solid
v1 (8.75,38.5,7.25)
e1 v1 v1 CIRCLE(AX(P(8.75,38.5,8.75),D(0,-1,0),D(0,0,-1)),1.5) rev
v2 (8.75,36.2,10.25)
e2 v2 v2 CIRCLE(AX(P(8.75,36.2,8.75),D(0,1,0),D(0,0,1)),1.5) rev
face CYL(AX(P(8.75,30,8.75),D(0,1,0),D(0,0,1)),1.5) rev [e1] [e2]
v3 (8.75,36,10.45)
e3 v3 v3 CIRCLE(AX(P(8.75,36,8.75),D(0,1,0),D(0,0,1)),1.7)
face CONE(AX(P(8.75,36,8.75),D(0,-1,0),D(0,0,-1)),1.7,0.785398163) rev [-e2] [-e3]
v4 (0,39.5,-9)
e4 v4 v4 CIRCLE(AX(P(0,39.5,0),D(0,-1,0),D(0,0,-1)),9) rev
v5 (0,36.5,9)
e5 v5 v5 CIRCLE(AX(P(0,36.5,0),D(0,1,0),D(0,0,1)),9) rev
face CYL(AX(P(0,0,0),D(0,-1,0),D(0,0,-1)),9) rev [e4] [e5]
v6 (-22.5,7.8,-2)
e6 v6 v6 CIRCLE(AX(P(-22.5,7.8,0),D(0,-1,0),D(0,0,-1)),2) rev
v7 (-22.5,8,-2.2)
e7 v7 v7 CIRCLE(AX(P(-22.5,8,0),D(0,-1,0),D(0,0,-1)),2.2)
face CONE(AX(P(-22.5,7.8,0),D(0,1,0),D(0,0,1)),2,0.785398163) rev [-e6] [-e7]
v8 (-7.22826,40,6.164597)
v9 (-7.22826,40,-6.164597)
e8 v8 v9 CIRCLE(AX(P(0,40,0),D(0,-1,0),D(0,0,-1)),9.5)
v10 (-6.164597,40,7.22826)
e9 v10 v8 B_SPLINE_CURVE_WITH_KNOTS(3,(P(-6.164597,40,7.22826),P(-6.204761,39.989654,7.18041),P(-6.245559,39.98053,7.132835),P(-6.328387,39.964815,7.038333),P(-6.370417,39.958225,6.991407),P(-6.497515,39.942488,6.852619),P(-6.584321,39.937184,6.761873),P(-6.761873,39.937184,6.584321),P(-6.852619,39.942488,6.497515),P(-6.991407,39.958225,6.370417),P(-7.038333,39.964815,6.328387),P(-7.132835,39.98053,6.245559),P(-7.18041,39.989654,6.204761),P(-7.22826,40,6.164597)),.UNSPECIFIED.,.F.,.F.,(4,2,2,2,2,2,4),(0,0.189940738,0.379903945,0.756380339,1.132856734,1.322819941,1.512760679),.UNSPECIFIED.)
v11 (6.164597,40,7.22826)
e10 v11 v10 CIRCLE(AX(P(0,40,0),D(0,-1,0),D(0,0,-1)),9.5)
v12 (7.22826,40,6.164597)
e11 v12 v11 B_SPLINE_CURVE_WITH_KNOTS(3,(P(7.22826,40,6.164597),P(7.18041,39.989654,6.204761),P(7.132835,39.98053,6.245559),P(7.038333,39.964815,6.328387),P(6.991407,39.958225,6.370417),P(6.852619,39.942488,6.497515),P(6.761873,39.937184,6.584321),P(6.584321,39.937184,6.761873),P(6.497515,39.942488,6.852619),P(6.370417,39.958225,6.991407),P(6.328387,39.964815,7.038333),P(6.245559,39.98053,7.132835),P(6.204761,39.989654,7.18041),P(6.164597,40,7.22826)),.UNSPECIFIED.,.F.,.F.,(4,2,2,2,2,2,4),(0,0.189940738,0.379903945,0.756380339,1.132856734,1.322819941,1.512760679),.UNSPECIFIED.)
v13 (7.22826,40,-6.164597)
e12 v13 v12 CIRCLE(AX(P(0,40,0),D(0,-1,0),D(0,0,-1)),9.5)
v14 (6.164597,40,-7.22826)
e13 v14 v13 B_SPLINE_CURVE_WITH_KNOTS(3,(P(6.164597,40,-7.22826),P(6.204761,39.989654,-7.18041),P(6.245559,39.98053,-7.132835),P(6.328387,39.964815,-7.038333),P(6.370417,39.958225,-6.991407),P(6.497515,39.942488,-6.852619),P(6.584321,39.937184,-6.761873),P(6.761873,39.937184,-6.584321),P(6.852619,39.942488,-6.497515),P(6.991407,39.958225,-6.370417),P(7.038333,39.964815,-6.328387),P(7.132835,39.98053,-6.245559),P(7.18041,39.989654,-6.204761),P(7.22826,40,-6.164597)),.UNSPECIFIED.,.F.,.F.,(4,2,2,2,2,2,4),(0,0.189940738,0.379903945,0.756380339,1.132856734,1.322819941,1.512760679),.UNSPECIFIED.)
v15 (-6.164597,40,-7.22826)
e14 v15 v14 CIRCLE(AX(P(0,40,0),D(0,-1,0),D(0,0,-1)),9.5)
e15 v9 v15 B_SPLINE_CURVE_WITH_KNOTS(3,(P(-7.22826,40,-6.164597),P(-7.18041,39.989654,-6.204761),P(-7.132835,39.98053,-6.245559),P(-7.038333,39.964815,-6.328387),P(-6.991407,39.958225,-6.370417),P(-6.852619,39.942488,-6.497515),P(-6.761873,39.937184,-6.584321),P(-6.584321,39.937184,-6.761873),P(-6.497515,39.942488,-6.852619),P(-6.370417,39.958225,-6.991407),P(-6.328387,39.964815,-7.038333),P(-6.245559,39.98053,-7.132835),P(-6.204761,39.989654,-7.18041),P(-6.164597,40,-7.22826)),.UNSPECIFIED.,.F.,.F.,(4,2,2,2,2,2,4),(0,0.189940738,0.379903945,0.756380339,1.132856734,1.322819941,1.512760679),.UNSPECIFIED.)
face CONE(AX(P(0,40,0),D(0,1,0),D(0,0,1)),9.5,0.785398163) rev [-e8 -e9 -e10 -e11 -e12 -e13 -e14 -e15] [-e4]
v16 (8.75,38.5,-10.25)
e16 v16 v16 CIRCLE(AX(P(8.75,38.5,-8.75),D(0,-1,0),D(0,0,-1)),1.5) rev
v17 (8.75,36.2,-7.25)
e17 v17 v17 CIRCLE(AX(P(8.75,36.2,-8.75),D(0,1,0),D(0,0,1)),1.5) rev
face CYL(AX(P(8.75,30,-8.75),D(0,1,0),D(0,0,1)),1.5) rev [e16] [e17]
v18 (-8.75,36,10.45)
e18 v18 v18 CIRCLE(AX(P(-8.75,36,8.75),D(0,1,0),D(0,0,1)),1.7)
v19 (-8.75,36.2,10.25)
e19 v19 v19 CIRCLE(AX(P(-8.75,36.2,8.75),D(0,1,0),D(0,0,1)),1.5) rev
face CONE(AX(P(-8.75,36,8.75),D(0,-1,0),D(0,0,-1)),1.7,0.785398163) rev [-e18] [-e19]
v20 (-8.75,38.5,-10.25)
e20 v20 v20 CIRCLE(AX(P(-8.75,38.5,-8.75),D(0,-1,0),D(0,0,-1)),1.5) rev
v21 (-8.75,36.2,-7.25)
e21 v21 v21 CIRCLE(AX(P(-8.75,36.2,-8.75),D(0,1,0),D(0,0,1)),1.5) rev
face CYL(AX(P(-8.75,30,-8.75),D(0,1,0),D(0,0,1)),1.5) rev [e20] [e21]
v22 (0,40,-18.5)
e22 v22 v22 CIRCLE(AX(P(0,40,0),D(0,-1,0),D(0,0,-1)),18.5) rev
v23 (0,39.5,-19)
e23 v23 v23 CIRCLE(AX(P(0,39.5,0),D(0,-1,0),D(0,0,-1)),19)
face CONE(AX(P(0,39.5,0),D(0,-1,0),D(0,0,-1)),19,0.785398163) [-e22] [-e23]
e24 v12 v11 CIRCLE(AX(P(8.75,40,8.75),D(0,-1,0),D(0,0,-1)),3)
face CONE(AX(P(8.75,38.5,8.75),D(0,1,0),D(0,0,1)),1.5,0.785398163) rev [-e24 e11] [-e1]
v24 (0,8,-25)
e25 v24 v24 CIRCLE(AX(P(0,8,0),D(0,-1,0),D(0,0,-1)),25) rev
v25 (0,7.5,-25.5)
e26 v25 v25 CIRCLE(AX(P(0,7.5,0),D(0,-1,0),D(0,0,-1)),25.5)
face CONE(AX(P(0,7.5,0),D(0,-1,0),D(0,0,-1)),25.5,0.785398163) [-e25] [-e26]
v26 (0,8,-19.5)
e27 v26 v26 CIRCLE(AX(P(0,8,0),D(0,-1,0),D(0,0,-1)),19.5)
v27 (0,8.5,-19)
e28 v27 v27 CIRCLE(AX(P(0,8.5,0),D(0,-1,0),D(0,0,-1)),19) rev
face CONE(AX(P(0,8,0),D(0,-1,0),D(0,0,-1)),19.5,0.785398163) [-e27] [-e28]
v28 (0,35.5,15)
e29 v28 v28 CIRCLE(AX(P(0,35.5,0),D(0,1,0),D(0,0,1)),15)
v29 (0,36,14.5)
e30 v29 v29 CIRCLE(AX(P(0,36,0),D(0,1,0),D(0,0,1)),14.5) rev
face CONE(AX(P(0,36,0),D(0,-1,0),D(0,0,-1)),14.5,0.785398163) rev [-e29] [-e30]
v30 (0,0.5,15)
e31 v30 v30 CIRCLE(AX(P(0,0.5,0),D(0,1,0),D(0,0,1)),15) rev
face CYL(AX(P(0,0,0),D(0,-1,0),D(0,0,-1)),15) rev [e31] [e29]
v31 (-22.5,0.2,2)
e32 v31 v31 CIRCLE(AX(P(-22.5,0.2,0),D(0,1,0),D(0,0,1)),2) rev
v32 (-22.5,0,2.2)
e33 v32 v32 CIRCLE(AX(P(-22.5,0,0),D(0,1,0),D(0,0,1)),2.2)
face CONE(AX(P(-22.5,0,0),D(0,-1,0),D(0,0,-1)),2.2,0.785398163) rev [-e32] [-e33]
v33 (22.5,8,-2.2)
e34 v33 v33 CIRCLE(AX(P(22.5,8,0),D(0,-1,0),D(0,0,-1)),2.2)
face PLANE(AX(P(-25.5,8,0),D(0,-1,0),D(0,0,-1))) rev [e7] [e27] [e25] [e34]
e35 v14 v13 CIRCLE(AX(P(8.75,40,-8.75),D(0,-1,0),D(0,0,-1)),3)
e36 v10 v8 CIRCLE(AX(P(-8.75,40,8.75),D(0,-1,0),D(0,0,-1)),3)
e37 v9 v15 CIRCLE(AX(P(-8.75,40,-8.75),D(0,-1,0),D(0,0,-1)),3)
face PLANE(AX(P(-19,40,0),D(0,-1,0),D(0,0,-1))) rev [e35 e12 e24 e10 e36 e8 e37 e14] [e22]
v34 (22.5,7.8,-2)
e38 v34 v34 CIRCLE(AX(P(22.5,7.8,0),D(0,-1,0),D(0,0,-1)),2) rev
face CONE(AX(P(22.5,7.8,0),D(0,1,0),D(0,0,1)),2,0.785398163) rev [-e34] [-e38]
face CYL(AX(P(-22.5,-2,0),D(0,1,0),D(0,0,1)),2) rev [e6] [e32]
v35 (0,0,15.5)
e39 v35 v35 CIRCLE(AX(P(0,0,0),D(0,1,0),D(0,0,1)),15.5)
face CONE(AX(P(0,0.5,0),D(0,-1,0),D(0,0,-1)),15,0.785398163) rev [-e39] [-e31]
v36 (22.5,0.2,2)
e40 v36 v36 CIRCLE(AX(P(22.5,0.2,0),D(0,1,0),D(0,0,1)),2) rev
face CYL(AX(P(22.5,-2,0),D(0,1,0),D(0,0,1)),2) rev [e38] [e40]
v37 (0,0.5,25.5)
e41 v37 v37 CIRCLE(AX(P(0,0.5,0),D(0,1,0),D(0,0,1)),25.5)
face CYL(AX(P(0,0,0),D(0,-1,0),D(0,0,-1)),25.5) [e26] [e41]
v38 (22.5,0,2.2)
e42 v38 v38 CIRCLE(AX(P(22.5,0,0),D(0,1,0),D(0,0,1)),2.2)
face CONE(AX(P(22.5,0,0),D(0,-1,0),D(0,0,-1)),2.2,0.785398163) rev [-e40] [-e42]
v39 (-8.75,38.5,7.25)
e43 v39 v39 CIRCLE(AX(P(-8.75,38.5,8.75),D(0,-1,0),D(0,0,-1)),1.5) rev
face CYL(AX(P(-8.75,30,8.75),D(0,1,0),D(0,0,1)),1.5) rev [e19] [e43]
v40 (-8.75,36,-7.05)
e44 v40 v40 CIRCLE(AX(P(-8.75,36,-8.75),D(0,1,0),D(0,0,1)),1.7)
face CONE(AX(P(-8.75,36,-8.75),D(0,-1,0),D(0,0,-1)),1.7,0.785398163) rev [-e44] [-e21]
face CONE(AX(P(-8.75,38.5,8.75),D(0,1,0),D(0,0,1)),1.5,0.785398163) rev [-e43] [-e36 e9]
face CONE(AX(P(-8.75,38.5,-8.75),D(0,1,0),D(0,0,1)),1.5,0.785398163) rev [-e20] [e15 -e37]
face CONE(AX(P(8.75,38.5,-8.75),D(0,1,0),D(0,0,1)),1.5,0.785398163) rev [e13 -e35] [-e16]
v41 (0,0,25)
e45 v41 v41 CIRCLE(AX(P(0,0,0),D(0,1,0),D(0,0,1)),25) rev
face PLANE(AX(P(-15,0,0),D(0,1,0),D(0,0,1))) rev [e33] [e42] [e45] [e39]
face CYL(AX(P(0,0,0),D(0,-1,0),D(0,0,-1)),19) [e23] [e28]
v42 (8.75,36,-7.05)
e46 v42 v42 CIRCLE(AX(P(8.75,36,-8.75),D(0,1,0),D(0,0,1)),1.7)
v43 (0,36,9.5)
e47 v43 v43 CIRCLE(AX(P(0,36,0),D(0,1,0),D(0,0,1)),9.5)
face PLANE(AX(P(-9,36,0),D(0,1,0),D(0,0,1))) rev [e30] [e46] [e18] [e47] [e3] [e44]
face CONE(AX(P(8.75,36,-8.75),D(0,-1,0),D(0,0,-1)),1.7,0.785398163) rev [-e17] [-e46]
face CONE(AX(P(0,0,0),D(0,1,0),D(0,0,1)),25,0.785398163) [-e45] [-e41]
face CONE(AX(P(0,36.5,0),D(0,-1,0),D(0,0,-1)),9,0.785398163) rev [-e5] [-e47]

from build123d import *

# Parameters (mm, degrees)
ESQUISSE2_R             = 1.5
ENL_V_MAT_EXTRU_1_DEPTH = 10
CHANFREIN1_SIZE         = 1.5
ESQUISSE3_R             = 2
ENL_V_MAT_EXTRU_2_DEPTH = 10
CHANFREIN2_SIZE         = 0.2
CHANFREIN3_SIZE         = 0.5


with BuildPart() as part:
    # Esquisse1 → Révolution1 (revolve)
    with BuildSketch(Plane.XY, mode=Mode.PRIVATE) as r_volution1_sk:
        Polygon((-15, 0), (-25.5, 0), (-25.5, 8), (-19, 8), (-19, 40), (-9, 40), (-9, 36), (-15, 36), align=None)
    revolve(r_volution1_sk.sketch.rotate(Axis((0, 0, 0), (0, 1, 0)), 270), axis=Axis((0, 0, 0), (0, 1, 0)))

    # Esquisse2 → Enlèv. mat.-Extru.1 (cut)
    with BuildSketch(Plane(origin=(0, 40, 0), x_dir=(1, 0, 0), z_dir=(0, 1, 0))):
        with Locations(Location((-8.75, 8.75, 0), (0, 0, 270))):
            Circle(ESQUISSE2_R)
        with Locations(Location((8.75, 8.75, 0), (0, 0, 270))):
            Circle(ESQUISSE2_R)
        with Locations(Location((8.75, -8.75, 0), (0, 0, 270))):
            Circle(ESQUISSE2_R)
        with Locations(Location((-8.75, -8.75, 0), (0, 0, 270))):
            Circle(ESQUISSE2_R)
    extrude(amount=-ENL_V_MAT_EXTRU_1_DEPTH, mode=Mode.SUBTRACT)

    # Chanfrein1
    chanfrein1_edges = [part.edges().sort_by_distance(p)[0] for p in [
        (-8.75, 40, -10.25),
        (8.75, 40, -10.25),
        (8.75, 40, 7.25),
        (-8.75, 40, 7.25),
    ]]
    chamfer(chanfrein1_edges, length=CHANFREIN1_SIZE)

    # Esquisse3 → Enlèv. mat.-Extru.2 (cut)
    with BuildSketch(Plane(origin=(0, 8, 0), x_dir=(1, 0, 0), z_dir=(0, 1, 0))):
        with Locations(Location((-22.5, 0, 0), (0, 0, 270))):
            Circle(ESQUISSE3_R)
        with Locations(Location((22.5, 0, 0), (0, 0, 270))):
            Circle(ESQUISSE3_R)
    extrude(amount=-ENL_V_MAT_EXTRU_2_DEPTH, mode=Mode.SUBTRACT)

    # Chanfrein2
    chanfrein2_edges = [part.edges().sort_by_distance(p)[0] for p in [
        (-8.75, 36, -10.25),
        (8.75, 36, -10.25),
        (8.75, 36, 7.25),
        (-8.75, 36, 7.25),
        (-22.5, 0, -2),
        (-22.5, 8, -2),
        (22.5, 0, -2),
        (22.5, 8, -2),
    ]]
    chamfer(chanfrein2_edges, length=CHANFREIN2_SIZE)

    # Chanfrein3
    # the kernel refuses this chamfer: 0.5 mm, written as the material it adds along each edge
    with BuildSketch(Plane(origin=(0, 36, 0), x_dir=(0, 0, -1), z_dir=(1, 0, 0))) as chanfrein3_piece_1:
        Polygon((15 - CHANFREIN3_SIZE, 0), (15, -CHANFREIN3_SIZE), (15, 0), align=None)
    revolve(axis=Axis((0, 36, 0), (0, 1, 0)))
    with BuildSketch(Plane(origin=(0, 8, 0), x_dir=(0, 0, -1), z_dir=(1, 0, 0))) as chanfrein3_piece_2:
        Polygon((19, CHANFREIN3_SIZE), (19 + CHANFREIN3_SIZE, 0), (19, 0), align=None)
    revolve(axis=Axis((0, 8, 0), (0, 1, 0)))
    # the kernel refuses this chamfer: 0.5 mm, written as the material it takes off along each edge
    with BuildSketch(Plane(origin=(0, 36, 0), x_dir=(0, 0, -1), z_dir=(1, 0, 0))) as chanfrein3_2_piece_1:
        Polygon((9 + CHANFREIN3_SIZE, 0), (9, CHANFREIN3_SIZE), (9, 0), align=None)
    revolve(axis=Axis((0, 36, 0), (0, 1, 0)), mode=Mode.SUBTRACT)
    with BuildSketch(Plane(origin=(0, 40, 0), x_dir=(0, 0, -1), z_dir=(1, 0, 0))) as chanfrein3_2_piece_2:
        Polygon((9 + CHANFREIN3_SIZE, 0), (9, -CHANFREIN3_SIZE), (9, 0), align=None)
    revolve(axis=Axis((0, 40, 0), (0, 1, 0)), mode=Mode.SUBTRACT)
    with BuildSketch(Plane(origin=(0, 40, 0), x_dir=(0, 0, -1), z_dir=(1, 0, 0))) as chanfrein3_2_piece_3:
        Polygon((19 - CHANFREIN3_SIZE, 0), (19, -CHANFREIN3_SIZE), (19, 0), align=None)
    revolve(axis=Axis((0, 40, 0), (0, 1, 0)), mode=Mode.SUBTRACT)
    with BuildSketch(Plane(origin=(0, 8, 0), x_dir=(0, 0, -1), z_dir=(1, 0, 0))) as chanfrein3_2_piece_4:
        Polygon((25.5 - CHANFREIN3_SIZE, 0), (25.5, -CHANFREIN3_SIZE), (25.5, 0), align=None)
    revolve(axis=Axis((0, 8, 0), (0, 1, 0)), mode=Mode.SUBTRACT)
    with BuildSketch(Plane(origin=(0, 0, 0), x_dir=(0, 0, -1), z_dir=(1, 0, 0))) as chanfrein3_2_piece_5:
        Polygon((25.5 - CHANFREIN3_SIZE, 0), (25.5, CHANFREIN3_SIZE), (25.5, 0), align=None)
    revolve(axis=Axis((0, 0, 0), (0, 1, 0)), mode=Mode.SUBTRACT)
    with BuildSketch(Plane(origin=(0, 0, 0), x_dir=(0, 0, -1), z_dir=(1, 0, 0))) as chanfrein3_2_piece_6:
        Polygon((15, CHANFREIN3_SIZE), (15 + CHANFREIN3_SIZE, 0), (15, 0), align=None)
    revolve(axis=Axis((0, 0, 0), (0, 1, 0)), mode=Mode.SUBTRACT)


solid = part.part
